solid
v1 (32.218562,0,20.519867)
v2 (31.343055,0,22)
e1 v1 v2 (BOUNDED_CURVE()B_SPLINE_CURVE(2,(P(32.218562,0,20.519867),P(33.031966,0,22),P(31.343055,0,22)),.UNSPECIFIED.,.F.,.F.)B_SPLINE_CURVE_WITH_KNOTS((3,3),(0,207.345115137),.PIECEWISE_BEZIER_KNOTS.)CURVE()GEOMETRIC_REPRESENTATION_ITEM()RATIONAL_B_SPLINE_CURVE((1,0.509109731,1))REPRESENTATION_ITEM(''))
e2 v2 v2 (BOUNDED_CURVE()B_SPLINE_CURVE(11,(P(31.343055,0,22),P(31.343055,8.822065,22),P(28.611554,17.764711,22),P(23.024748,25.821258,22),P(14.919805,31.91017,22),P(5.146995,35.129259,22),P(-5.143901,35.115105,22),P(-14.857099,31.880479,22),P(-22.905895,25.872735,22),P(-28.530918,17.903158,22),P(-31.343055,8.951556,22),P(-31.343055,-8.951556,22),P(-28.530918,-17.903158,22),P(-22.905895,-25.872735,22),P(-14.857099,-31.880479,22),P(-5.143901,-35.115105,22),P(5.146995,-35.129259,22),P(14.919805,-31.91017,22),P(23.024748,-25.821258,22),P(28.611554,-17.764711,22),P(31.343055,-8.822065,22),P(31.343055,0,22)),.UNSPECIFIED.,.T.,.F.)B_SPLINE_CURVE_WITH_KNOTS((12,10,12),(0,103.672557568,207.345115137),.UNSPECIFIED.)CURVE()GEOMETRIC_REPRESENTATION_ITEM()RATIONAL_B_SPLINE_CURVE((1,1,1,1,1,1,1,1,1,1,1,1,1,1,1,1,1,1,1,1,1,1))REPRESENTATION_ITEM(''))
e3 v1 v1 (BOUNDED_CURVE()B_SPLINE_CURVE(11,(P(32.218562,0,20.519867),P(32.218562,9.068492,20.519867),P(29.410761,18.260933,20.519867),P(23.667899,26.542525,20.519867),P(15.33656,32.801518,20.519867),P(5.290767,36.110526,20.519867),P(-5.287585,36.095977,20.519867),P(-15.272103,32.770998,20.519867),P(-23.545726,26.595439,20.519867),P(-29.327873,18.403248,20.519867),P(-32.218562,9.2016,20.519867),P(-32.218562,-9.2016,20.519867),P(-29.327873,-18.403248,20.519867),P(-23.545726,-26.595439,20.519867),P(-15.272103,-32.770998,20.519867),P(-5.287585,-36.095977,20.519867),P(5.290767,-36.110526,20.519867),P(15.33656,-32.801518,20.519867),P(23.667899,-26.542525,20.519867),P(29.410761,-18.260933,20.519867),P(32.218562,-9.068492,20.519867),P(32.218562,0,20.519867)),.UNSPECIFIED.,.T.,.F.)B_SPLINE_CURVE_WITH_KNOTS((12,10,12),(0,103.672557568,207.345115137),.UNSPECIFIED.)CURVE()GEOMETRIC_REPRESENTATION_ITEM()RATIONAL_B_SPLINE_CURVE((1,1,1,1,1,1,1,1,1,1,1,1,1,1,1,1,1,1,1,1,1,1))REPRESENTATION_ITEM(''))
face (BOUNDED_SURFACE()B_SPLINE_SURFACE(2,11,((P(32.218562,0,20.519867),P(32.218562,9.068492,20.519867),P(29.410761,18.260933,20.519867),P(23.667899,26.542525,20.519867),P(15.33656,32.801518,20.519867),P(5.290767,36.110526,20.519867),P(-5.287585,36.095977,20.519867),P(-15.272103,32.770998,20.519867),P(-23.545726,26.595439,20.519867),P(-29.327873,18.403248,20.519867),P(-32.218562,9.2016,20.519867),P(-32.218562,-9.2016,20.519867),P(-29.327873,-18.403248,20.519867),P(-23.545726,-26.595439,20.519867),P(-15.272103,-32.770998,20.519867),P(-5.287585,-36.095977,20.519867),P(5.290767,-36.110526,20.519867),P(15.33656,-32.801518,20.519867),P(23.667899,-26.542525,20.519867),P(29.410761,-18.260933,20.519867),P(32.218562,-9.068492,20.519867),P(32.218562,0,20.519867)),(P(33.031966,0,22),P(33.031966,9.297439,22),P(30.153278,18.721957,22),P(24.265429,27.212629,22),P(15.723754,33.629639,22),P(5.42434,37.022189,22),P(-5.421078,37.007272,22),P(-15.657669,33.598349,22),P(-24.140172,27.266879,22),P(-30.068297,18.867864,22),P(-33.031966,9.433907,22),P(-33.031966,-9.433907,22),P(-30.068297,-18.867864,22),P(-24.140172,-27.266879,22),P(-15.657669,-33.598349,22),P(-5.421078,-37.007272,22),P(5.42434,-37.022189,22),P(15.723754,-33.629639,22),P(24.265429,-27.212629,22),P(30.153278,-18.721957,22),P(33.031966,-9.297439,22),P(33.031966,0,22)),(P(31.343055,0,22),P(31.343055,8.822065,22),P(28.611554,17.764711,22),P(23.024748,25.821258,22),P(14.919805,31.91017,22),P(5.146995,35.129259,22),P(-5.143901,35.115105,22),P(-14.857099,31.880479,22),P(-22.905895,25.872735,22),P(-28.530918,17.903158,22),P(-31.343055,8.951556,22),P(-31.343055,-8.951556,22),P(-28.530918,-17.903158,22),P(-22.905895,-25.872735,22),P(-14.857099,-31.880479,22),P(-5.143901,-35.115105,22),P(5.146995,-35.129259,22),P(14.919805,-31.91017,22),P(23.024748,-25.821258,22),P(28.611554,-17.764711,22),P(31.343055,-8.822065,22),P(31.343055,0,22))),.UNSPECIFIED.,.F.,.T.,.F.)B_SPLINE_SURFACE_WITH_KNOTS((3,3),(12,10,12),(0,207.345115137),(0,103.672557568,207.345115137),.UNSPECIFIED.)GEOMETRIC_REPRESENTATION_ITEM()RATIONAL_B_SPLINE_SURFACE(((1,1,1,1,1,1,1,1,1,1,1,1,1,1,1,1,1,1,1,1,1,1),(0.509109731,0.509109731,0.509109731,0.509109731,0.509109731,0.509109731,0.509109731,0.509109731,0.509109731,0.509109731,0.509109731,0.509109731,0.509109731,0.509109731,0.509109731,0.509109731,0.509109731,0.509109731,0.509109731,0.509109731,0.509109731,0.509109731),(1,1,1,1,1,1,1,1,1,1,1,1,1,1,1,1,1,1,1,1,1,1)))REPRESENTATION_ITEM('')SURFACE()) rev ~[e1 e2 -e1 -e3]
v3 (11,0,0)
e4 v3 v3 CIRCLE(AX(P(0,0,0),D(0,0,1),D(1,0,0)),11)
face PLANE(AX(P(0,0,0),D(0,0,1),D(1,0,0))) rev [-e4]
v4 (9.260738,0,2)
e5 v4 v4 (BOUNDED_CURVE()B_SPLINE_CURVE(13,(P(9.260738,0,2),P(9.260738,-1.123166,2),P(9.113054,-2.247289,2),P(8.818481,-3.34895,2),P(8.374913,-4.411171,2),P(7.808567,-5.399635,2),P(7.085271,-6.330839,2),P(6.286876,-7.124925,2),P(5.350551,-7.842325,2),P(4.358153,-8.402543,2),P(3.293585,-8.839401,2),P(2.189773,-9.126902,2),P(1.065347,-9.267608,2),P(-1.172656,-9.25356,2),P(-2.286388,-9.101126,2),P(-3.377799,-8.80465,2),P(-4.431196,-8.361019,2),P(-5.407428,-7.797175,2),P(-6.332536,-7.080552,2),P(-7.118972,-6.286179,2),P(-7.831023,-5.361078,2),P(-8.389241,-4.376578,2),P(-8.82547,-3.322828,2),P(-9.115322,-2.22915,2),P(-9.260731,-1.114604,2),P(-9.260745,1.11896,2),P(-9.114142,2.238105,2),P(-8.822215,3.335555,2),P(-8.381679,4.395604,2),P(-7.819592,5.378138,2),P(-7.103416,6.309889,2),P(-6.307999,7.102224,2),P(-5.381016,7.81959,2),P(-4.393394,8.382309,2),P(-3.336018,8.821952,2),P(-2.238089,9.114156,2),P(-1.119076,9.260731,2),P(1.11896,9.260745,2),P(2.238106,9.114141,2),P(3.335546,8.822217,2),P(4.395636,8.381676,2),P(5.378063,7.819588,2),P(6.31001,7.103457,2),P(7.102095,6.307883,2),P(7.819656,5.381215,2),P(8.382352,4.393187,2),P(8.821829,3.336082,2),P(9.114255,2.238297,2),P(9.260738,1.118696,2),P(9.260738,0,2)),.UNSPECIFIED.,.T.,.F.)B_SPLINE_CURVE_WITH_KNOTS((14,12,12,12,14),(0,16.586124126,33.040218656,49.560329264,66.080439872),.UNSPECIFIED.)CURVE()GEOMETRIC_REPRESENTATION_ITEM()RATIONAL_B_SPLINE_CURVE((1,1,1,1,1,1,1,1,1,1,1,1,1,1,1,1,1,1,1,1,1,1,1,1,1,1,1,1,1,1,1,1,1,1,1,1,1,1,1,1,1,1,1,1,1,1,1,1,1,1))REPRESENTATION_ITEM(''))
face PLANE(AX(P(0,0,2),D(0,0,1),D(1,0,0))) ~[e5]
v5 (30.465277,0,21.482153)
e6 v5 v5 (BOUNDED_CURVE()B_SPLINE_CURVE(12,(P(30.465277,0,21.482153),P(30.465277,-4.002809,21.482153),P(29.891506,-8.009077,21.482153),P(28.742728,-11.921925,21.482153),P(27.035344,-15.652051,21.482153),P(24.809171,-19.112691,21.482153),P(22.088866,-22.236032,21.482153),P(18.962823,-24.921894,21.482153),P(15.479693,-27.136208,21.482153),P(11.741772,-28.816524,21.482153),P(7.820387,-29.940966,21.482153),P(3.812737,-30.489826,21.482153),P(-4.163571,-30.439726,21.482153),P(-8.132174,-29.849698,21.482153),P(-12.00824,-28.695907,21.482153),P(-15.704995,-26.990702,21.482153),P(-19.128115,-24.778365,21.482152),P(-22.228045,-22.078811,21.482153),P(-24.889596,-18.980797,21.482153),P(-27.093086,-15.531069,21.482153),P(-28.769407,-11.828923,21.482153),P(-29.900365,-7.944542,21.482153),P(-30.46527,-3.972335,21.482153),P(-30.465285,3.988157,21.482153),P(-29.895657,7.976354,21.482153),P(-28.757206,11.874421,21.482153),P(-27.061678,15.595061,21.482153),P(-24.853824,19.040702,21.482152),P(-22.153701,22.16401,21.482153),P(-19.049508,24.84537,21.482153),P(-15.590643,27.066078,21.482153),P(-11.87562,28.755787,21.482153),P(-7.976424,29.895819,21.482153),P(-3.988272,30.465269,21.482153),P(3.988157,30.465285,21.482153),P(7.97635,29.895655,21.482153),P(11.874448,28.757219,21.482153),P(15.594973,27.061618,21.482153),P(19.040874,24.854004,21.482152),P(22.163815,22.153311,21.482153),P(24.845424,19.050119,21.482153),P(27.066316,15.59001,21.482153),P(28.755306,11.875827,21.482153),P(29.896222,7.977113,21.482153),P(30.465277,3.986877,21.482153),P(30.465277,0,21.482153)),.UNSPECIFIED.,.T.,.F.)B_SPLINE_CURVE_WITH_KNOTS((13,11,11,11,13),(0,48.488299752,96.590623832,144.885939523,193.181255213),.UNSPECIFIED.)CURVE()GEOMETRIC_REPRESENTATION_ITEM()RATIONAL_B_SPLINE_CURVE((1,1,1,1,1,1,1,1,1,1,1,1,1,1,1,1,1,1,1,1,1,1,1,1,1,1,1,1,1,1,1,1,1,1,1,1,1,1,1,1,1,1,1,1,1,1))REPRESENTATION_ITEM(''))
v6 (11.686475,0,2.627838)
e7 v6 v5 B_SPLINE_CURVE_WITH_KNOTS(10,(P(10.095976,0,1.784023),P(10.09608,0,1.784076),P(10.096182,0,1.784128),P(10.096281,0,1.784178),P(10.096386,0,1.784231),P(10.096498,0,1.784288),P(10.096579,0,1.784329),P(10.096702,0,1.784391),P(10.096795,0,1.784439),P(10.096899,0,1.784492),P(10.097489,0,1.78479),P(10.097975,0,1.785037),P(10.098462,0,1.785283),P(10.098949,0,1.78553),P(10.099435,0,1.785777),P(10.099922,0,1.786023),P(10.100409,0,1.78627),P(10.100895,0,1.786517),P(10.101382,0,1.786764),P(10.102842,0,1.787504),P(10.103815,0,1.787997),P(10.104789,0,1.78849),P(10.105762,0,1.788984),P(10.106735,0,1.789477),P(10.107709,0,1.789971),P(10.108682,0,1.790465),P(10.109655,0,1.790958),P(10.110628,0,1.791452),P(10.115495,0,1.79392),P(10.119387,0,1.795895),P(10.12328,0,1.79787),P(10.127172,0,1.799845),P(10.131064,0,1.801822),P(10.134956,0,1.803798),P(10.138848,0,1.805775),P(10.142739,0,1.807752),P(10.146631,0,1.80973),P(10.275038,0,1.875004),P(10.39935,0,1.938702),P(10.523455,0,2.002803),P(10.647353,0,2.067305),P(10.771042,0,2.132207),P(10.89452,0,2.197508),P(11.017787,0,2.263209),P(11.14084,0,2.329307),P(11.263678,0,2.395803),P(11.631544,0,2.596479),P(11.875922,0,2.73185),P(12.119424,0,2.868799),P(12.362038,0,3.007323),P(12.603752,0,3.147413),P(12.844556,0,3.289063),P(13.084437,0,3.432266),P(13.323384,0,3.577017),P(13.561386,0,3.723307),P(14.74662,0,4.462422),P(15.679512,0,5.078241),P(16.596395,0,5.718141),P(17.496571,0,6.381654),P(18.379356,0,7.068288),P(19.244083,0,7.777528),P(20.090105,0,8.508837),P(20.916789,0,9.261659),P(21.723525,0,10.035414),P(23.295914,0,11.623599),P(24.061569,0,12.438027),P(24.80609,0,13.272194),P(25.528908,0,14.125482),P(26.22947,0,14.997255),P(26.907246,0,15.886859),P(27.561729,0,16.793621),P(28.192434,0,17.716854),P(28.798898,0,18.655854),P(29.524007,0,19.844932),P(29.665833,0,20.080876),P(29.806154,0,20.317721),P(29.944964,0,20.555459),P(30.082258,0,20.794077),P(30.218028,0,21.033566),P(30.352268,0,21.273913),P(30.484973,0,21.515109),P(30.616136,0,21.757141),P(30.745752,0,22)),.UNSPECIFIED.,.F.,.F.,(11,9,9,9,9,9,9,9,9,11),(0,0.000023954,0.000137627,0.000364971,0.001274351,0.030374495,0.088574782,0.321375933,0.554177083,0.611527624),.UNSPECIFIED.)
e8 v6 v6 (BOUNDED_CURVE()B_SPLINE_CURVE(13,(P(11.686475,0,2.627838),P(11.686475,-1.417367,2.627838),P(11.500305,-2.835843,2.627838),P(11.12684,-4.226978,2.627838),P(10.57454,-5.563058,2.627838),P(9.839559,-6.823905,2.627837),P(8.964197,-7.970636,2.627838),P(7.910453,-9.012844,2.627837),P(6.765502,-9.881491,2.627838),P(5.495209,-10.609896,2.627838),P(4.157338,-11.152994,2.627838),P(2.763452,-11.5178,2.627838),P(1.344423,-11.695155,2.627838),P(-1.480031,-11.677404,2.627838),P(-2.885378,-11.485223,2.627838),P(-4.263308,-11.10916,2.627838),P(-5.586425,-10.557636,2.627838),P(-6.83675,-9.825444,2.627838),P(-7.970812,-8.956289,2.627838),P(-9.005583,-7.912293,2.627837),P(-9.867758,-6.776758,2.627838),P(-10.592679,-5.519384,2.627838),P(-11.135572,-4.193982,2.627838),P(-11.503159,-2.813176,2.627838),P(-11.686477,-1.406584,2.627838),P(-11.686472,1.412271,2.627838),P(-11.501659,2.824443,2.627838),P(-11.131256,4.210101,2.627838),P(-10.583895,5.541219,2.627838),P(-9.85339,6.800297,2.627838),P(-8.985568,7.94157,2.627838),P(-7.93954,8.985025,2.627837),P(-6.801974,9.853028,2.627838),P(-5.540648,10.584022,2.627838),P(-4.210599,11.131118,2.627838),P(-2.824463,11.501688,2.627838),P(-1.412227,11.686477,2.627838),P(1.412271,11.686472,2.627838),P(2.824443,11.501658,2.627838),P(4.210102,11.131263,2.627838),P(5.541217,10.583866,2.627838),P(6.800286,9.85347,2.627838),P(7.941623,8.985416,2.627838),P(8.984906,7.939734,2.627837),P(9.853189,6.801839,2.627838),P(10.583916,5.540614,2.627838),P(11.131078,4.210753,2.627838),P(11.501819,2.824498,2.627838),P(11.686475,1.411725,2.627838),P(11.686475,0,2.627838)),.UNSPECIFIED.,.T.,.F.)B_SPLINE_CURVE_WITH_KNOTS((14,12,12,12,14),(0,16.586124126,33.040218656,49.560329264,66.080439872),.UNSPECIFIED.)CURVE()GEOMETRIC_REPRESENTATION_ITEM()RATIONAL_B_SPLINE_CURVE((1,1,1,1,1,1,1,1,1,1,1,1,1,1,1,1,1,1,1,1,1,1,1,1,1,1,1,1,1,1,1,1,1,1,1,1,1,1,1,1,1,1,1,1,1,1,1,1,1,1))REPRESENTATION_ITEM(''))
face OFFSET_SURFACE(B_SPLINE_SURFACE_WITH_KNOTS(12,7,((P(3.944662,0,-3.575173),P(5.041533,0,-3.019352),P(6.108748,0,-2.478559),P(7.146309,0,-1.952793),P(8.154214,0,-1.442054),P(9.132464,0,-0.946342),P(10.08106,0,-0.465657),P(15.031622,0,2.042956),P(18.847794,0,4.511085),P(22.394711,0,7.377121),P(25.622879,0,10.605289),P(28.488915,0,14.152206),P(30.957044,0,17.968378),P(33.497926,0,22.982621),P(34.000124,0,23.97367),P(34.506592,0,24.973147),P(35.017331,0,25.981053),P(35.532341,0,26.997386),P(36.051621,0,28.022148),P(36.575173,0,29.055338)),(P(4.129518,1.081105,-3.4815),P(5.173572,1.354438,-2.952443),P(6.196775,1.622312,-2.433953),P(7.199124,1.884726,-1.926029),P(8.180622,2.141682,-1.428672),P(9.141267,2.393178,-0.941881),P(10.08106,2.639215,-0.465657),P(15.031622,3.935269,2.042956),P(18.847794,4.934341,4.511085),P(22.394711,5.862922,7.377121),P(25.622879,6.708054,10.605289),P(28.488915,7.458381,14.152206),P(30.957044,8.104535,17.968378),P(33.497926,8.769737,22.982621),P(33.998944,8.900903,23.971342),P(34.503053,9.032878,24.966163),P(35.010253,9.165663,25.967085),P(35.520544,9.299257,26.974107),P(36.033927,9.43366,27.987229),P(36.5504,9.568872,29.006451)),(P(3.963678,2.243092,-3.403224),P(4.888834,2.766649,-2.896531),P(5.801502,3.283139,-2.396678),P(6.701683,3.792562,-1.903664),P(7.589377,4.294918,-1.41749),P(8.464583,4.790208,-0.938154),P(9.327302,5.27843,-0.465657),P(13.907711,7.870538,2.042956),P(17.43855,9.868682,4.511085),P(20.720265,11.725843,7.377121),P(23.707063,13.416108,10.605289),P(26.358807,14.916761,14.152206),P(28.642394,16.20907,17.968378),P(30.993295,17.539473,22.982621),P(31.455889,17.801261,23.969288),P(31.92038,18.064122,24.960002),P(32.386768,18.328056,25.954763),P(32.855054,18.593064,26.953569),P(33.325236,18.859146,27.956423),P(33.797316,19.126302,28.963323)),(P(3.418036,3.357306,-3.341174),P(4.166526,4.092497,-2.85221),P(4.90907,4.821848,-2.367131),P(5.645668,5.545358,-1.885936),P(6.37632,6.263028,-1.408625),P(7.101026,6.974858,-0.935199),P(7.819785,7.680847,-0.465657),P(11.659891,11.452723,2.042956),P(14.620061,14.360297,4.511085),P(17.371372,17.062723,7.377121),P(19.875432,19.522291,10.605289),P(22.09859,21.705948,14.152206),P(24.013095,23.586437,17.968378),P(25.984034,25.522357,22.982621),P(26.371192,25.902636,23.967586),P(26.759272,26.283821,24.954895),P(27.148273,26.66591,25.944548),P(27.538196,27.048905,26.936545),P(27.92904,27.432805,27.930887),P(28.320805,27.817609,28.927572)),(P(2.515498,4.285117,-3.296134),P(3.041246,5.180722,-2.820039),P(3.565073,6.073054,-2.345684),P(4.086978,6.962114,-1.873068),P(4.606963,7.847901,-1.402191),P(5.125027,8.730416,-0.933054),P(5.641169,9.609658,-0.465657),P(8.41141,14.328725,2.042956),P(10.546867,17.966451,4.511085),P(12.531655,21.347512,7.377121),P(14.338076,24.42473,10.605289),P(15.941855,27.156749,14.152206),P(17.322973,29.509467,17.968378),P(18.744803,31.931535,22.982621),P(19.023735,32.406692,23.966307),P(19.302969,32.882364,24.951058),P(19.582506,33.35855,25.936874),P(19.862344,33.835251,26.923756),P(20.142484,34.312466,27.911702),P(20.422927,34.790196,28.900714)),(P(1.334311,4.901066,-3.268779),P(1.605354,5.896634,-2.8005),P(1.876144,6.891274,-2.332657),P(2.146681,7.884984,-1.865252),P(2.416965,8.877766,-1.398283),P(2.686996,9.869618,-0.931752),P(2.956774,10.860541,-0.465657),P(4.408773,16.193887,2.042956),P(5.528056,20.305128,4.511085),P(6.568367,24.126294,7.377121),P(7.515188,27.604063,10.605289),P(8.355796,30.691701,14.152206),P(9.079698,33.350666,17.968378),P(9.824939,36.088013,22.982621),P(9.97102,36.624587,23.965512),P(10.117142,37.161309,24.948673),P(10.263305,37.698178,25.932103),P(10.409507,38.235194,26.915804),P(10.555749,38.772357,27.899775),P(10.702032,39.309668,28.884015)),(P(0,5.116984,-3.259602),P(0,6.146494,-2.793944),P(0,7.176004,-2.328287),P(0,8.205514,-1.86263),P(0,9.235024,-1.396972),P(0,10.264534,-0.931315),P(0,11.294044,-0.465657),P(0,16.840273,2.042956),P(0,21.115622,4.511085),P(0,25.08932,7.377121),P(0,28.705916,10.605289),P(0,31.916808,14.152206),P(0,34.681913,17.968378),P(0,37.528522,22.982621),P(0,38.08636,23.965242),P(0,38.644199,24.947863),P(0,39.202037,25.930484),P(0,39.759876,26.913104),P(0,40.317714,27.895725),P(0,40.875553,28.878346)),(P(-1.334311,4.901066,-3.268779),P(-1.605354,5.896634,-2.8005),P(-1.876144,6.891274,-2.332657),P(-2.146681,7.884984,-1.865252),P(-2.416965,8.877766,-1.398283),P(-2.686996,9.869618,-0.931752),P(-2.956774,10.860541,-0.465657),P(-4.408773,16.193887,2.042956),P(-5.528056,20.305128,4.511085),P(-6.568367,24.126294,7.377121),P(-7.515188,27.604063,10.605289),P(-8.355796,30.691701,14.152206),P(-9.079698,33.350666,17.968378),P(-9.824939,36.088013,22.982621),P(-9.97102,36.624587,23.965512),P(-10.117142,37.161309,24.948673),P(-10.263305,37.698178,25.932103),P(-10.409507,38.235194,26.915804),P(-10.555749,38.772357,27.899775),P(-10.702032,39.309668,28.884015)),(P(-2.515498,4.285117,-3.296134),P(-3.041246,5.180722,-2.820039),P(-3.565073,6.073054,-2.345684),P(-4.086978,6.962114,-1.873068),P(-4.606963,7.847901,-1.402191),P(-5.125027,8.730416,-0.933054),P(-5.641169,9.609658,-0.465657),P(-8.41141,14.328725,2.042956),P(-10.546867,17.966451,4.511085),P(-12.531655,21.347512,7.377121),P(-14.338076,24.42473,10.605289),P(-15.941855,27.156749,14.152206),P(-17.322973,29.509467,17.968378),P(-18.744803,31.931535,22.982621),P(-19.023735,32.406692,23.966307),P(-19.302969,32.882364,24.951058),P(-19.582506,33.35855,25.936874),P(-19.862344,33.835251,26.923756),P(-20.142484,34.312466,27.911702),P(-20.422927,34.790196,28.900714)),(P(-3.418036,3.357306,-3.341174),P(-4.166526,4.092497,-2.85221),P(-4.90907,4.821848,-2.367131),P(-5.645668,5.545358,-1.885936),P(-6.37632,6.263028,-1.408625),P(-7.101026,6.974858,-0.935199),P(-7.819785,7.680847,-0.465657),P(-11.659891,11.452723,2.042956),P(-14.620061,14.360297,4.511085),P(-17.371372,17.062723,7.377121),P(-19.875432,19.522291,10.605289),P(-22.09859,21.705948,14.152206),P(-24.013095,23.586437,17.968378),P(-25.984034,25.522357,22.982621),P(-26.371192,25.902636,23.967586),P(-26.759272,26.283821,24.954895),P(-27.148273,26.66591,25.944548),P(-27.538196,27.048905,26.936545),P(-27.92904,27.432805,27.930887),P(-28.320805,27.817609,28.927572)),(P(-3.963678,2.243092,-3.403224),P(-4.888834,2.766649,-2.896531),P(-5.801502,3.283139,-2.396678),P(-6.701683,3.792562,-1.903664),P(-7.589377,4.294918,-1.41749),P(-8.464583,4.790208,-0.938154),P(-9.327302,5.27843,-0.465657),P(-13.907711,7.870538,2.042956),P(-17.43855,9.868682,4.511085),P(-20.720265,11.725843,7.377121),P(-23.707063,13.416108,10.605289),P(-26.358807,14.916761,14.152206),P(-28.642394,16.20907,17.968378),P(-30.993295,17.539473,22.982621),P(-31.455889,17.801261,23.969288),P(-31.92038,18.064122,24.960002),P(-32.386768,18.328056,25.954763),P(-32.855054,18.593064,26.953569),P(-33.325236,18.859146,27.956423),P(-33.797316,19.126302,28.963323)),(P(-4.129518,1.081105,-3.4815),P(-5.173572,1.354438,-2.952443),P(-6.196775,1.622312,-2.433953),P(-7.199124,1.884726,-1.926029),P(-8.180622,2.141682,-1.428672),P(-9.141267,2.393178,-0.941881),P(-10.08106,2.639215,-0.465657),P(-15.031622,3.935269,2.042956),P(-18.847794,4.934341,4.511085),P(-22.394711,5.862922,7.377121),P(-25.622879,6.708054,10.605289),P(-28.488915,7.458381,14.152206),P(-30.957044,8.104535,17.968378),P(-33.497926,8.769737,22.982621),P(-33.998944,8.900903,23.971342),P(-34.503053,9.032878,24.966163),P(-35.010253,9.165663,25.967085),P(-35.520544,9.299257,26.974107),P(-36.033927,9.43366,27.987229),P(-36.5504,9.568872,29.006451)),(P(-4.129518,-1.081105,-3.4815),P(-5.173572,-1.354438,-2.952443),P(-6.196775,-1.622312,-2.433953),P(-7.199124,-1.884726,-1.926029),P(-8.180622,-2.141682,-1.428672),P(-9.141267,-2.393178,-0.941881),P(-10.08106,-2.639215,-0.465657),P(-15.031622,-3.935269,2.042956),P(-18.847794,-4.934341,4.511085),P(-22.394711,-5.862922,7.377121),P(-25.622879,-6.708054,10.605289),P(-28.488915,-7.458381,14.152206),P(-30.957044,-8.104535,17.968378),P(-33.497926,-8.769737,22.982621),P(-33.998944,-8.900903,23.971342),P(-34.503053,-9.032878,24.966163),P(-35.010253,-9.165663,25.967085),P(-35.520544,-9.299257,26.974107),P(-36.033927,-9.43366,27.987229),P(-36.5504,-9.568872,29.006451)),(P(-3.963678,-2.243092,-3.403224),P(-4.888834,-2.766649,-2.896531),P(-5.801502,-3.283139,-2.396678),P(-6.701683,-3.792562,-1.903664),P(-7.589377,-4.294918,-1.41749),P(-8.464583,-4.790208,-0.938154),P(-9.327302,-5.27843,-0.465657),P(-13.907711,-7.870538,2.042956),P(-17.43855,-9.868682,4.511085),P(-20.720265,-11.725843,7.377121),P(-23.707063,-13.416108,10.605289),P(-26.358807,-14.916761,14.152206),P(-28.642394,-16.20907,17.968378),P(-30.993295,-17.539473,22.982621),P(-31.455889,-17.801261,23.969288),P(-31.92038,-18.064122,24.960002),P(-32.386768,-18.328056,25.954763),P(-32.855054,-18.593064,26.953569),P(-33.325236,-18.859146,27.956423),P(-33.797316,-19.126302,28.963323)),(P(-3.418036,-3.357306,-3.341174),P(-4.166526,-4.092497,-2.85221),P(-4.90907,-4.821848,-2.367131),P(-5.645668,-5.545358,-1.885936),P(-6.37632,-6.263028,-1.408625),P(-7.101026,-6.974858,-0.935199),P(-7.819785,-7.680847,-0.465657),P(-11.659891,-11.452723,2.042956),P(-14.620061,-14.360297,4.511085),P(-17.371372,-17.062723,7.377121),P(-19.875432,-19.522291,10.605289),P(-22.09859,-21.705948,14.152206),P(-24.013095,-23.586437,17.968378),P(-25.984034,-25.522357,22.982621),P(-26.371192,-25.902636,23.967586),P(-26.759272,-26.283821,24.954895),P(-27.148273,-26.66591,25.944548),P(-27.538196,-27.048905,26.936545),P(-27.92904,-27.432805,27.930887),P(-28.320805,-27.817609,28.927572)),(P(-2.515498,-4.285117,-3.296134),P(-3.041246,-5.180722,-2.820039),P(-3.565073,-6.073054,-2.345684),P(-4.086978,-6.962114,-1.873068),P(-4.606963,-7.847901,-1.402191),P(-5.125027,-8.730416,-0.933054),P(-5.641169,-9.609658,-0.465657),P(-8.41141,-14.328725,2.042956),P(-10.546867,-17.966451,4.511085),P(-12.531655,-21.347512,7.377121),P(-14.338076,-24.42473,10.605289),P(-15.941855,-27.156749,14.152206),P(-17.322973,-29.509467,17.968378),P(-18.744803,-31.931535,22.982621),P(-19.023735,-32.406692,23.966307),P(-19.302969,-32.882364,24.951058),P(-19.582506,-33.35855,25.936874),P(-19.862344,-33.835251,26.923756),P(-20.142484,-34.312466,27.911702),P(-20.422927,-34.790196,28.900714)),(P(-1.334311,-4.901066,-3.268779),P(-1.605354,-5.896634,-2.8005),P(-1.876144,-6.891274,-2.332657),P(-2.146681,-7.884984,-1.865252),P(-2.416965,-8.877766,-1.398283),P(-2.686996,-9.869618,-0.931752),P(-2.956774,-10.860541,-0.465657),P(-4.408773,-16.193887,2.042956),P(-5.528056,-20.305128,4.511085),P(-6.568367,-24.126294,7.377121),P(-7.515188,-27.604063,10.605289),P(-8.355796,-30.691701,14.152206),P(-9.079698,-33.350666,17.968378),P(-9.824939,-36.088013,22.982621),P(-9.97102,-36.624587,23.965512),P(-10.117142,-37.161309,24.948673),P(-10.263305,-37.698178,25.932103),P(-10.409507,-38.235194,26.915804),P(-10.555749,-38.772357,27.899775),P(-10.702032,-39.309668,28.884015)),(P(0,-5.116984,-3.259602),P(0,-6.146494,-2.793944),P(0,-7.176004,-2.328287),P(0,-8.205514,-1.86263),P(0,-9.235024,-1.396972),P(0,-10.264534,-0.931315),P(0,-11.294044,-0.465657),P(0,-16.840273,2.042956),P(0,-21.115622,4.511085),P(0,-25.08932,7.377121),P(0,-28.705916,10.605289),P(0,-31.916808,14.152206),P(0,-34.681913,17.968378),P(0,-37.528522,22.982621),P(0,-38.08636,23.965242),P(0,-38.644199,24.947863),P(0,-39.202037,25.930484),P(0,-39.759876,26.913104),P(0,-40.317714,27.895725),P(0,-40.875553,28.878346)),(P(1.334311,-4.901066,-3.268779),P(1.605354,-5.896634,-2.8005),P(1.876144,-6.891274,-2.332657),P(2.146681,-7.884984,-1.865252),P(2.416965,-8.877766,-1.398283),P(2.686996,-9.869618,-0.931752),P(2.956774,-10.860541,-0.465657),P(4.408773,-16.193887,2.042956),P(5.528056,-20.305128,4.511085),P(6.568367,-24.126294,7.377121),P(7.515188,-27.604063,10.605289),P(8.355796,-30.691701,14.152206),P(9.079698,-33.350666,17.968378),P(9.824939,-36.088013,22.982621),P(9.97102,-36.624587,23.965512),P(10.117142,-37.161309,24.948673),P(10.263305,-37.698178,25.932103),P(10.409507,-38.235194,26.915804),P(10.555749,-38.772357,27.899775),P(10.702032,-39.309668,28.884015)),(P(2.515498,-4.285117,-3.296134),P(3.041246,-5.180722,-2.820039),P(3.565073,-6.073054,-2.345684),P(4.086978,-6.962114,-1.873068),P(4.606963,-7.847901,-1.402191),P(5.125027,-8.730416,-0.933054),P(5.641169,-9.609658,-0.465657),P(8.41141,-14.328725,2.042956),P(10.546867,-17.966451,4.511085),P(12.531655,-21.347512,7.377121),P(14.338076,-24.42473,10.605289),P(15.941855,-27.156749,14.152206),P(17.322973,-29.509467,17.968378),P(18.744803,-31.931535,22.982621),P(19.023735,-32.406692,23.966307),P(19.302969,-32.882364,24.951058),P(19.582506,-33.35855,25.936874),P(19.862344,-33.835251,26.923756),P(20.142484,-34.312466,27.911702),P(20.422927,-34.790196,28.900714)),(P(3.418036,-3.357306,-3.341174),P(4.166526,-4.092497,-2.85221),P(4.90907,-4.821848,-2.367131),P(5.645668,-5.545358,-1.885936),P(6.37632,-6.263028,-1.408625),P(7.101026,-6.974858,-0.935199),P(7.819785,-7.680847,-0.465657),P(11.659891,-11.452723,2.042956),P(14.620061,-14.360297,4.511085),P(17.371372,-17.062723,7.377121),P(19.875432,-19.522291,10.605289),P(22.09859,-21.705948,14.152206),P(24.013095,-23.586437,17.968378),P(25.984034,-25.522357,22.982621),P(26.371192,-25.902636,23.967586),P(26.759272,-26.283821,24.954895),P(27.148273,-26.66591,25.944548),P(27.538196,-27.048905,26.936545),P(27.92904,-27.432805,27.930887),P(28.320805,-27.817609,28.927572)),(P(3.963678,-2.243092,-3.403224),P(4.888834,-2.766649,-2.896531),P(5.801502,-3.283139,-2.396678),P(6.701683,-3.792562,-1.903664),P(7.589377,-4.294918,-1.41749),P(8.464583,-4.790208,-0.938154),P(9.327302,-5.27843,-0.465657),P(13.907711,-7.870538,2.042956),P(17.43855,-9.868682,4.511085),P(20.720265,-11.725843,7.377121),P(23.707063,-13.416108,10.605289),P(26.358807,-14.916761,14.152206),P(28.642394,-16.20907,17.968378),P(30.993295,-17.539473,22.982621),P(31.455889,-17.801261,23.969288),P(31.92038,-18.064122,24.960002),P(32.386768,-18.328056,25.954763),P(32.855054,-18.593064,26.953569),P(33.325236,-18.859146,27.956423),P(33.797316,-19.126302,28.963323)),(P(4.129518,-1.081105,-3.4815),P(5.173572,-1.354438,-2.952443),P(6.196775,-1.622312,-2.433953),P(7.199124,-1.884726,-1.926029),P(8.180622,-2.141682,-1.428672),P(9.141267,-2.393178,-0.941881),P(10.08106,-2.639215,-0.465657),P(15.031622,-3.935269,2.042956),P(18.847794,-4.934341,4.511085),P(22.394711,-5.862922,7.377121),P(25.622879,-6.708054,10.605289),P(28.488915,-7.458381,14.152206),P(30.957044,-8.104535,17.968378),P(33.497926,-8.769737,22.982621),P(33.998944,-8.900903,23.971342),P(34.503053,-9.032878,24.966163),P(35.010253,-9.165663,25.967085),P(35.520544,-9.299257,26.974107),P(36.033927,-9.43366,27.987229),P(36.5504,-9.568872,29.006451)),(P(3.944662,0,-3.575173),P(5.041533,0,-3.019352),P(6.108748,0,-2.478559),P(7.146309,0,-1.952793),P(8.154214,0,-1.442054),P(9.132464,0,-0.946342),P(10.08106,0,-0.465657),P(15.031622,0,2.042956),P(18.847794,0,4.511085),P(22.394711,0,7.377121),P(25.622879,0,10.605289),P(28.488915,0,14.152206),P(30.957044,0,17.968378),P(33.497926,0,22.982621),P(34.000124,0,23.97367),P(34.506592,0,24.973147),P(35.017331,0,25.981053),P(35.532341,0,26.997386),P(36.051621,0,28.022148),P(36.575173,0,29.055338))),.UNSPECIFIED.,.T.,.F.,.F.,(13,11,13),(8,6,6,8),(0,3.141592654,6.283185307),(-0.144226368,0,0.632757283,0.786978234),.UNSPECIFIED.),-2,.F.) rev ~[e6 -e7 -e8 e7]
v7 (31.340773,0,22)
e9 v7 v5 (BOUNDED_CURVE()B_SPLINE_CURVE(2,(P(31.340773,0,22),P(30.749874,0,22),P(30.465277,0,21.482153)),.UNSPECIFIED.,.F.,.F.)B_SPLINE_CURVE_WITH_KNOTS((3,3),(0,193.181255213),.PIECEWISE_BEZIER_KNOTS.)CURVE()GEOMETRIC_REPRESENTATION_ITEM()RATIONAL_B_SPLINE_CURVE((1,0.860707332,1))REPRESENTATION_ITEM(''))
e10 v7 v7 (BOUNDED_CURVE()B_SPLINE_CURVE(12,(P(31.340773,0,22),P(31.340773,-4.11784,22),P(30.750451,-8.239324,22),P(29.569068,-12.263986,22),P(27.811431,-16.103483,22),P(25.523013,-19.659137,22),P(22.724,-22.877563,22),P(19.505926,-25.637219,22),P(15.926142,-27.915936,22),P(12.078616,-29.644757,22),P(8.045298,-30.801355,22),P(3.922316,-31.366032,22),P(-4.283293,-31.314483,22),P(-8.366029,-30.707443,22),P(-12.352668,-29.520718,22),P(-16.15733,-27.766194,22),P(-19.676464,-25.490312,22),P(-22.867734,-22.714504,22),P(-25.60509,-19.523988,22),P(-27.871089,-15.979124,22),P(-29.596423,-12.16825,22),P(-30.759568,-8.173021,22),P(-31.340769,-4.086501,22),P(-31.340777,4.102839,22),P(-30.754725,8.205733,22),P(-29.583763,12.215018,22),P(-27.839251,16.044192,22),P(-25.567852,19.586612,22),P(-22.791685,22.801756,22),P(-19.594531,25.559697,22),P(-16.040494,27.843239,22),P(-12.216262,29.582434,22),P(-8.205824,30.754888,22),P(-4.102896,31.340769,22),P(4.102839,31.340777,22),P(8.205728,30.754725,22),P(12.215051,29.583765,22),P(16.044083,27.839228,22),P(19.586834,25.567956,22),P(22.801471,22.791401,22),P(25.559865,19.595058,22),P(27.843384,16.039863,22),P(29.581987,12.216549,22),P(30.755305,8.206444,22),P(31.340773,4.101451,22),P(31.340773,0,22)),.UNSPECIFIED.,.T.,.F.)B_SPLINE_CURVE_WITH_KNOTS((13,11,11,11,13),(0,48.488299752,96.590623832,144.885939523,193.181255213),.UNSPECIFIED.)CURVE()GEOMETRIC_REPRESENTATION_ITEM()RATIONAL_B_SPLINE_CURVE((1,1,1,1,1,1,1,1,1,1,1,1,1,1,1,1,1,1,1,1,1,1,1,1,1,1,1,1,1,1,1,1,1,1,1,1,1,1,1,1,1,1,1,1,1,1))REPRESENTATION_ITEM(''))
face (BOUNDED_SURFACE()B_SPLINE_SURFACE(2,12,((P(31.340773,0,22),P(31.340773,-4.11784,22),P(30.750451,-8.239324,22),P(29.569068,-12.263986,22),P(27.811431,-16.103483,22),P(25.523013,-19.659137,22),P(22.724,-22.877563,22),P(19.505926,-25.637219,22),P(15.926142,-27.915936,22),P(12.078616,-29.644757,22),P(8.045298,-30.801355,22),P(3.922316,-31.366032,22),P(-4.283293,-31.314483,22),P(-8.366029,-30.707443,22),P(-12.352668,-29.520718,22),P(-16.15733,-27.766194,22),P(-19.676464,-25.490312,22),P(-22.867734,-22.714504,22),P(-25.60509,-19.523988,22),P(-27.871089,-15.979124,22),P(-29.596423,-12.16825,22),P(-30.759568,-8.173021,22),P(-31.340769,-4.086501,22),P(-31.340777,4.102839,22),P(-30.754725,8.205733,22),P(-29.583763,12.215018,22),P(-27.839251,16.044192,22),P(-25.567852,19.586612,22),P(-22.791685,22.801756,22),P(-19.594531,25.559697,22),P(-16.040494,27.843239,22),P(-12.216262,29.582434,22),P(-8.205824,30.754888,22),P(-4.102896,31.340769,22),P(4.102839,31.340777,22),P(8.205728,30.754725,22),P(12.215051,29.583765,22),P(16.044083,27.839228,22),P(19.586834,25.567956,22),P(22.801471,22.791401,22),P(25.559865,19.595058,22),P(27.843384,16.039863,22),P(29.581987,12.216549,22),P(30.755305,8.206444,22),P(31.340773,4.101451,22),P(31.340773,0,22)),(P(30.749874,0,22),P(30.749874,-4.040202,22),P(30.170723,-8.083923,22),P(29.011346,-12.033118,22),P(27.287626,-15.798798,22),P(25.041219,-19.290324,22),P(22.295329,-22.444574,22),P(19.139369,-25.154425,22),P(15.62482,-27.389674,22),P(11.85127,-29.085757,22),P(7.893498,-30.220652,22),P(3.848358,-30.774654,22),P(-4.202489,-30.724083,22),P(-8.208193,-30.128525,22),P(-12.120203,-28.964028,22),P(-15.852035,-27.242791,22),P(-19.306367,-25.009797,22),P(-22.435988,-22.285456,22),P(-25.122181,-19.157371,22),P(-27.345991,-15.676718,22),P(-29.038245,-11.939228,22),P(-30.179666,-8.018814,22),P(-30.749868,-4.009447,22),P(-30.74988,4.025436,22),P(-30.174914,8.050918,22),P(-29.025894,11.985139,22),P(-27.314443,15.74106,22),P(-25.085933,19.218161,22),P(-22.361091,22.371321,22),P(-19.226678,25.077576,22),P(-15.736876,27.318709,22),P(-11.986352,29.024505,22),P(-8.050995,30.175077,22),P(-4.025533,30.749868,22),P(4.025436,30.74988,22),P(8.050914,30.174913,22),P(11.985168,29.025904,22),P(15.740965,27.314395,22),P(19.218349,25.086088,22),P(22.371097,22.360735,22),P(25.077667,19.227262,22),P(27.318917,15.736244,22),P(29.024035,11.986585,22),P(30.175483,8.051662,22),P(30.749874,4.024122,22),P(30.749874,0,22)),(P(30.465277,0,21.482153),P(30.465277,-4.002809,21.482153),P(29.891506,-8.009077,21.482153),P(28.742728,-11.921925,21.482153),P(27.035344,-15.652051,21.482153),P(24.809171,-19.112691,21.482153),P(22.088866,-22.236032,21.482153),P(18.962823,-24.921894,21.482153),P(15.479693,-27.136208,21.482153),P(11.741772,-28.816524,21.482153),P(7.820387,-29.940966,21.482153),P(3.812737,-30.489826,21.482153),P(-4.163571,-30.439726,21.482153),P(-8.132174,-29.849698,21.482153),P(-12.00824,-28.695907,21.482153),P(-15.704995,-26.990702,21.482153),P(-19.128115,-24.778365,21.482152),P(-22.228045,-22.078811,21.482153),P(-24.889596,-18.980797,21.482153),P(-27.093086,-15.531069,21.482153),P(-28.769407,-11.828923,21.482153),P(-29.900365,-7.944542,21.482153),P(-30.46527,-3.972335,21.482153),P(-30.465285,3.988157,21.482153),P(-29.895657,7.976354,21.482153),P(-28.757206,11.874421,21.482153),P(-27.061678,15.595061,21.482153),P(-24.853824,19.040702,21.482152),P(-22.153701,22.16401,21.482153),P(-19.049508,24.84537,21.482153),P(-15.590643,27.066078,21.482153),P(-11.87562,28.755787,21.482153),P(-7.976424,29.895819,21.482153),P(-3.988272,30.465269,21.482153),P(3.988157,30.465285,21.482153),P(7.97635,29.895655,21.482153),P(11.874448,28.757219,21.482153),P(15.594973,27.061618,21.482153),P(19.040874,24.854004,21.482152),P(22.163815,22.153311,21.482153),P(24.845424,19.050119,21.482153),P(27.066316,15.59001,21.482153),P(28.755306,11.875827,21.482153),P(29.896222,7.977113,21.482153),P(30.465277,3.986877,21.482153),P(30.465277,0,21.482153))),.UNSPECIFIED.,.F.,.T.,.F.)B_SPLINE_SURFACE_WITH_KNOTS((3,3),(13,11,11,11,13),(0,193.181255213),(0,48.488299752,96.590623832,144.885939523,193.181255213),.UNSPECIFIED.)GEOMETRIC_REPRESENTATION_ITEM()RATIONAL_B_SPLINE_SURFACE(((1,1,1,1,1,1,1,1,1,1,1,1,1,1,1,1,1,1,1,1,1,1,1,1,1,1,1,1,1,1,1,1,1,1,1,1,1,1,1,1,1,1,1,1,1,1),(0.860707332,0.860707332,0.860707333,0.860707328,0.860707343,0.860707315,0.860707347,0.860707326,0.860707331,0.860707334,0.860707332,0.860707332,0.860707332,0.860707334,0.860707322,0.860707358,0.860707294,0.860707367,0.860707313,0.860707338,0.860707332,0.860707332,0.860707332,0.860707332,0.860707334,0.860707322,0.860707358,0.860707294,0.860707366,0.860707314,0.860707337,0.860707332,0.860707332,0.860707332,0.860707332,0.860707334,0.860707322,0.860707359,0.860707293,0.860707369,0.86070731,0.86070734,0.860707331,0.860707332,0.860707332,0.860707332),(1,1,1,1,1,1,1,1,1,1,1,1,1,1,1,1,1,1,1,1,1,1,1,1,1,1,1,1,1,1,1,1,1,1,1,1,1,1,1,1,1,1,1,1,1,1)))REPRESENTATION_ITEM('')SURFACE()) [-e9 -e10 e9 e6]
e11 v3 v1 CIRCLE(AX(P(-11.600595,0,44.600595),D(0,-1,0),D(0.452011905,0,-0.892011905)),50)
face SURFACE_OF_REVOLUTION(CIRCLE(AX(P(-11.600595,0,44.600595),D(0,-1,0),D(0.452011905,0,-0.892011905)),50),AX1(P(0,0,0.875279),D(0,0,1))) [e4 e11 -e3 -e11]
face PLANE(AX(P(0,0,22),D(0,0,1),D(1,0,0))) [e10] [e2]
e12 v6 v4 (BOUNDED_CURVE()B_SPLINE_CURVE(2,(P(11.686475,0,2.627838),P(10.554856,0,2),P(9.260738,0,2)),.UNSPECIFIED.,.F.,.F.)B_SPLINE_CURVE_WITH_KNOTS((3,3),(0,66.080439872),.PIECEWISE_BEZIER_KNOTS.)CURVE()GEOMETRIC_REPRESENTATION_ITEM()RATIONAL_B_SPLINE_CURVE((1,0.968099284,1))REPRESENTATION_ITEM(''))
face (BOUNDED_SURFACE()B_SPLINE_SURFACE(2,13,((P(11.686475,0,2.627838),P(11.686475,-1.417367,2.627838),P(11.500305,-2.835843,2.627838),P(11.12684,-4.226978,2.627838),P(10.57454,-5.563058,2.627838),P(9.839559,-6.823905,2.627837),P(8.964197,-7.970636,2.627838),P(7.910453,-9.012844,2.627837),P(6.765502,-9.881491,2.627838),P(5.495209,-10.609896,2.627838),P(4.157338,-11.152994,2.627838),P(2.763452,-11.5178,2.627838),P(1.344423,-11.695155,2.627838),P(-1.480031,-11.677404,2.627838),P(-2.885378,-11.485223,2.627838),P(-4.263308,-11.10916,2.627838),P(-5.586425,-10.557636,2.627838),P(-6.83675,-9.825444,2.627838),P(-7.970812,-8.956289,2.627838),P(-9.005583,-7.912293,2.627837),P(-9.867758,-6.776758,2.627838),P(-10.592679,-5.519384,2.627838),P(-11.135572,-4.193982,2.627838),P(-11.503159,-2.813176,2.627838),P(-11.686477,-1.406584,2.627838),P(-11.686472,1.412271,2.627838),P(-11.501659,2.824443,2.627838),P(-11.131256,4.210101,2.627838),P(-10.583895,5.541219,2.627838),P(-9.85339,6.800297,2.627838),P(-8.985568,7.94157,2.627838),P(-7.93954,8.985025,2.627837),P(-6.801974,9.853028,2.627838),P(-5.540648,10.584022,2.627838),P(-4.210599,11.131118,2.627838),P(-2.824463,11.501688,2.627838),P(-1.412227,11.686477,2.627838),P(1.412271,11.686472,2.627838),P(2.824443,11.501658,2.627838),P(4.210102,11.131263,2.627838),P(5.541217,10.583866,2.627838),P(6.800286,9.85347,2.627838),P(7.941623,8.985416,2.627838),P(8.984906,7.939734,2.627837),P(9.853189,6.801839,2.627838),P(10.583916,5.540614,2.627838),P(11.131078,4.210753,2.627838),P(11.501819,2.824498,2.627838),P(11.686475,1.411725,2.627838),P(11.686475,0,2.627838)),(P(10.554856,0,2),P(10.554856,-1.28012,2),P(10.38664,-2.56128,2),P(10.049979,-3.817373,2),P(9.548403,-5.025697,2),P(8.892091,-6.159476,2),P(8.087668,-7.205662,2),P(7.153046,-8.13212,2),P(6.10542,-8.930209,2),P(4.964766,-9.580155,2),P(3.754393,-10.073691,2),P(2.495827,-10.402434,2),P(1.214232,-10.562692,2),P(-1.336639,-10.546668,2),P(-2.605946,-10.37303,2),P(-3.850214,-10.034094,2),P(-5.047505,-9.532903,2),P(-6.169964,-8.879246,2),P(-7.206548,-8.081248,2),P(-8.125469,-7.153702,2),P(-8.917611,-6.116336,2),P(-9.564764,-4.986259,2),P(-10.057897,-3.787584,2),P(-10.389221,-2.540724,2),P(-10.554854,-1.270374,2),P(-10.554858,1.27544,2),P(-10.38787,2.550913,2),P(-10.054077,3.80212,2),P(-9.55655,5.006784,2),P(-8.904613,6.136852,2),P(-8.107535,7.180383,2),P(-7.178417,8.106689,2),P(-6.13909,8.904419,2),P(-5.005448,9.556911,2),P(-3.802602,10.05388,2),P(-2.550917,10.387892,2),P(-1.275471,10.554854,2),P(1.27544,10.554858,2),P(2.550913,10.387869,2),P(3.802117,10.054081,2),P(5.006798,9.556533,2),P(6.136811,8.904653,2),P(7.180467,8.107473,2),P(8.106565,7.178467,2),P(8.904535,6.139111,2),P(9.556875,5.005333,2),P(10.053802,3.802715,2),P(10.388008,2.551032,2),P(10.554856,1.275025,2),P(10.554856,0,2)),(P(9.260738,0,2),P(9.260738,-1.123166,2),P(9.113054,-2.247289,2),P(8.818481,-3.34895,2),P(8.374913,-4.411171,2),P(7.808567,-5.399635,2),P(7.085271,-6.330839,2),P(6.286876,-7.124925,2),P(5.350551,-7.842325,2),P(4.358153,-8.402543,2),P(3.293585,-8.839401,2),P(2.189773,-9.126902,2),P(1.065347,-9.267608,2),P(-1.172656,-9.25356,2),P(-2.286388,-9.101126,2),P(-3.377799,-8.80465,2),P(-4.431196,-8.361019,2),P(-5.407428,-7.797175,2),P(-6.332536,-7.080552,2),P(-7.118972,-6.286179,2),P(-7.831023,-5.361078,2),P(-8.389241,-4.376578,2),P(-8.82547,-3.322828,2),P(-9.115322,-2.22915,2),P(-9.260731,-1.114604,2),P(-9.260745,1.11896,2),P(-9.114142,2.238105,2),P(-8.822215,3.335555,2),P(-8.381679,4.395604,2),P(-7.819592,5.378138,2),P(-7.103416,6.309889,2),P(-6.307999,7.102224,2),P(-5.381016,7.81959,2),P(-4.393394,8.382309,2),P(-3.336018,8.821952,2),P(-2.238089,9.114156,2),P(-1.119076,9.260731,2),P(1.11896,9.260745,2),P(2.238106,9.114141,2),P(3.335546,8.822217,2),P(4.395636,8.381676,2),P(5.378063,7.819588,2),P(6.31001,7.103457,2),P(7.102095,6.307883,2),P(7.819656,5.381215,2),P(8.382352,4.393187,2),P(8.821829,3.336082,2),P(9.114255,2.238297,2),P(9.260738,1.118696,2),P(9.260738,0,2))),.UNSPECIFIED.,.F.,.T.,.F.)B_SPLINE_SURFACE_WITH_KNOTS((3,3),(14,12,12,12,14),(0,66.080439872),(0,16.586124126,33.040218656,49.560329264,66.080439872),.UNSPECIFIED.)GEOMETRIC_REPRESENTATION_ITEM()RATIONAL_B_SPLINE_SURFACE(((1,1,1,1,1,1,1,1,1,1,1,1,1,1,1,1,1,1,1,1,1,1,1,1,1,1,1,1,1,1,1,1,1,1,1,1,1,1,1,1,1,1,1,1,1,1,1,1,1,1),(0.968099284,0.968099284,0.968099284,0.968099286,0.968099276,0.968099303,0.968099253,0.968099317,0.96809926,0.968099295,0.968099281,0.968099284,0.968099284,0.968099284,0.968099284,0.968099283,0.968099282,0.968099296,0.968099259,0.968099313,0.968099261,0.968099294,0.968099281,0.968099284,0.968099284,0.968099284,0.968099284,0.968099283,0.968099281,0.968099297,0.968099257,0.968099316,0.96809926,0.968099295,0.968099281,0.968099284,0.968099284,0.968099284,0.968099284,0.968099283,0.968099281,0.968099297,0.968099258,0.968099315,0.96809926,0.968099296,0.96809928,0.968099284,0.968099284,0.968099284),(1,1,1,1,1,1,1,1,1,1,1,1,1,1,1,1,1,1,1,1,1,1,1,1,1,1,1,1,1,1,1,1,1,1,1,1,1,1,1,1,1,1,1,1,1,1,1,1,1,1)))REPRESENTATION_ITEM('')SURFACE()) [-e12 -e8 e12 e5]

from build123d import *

# Parameters (mm, degrees)
F2_T = -2
F3_R = 0.999
F4_R = 5


# Not quite as in the source:
# - a fillet or chamfer is up to 0.001 mm smaller than in the source, because OpenCascade refuses the exact size


with BuildPart() as f1:
    # F0 (on Front) → F1 (revolve)
    with BuildSketch(Plane.XZ):
        with BuildLine():
            Line((0, 0), (11, 0))
            ThreePointArc((11, 0), (23.7547438265, 9.2452561735), (33, 22))
            Line((33, 22), (0, 22))
            Line((0, 22), (0, 0))
        make_face()
    revolve(axis=Axis((0, 0, 0.8752791786), (0, 0, 1)))

    # F2
    f2_openings = [f1.faces().sort_by_distance(p)[0] for p in [
        (0, 0, 22),
    ]]
    offset(amount=F2_T, openings=f2_openings)

    # F3 (radius 1 in the source; OpenCascade refuses exactly that, so slightly less here)
    f3_edges = [f1.edges().sort_by_distance(p)[0] for p in [
        (-33, 0, 22),
        (-30.745752, 0, 22),
    ]]
    fillet(f3_edges, radius=F3_R)

    # F4
    f4_edges = [f1.edges().sort_by_distance(p)[0] for p in [
        (-10.517029, 0, 2),
    ]]
    fillet(f4_edges, radius=F4_R)


solid = f1.part
